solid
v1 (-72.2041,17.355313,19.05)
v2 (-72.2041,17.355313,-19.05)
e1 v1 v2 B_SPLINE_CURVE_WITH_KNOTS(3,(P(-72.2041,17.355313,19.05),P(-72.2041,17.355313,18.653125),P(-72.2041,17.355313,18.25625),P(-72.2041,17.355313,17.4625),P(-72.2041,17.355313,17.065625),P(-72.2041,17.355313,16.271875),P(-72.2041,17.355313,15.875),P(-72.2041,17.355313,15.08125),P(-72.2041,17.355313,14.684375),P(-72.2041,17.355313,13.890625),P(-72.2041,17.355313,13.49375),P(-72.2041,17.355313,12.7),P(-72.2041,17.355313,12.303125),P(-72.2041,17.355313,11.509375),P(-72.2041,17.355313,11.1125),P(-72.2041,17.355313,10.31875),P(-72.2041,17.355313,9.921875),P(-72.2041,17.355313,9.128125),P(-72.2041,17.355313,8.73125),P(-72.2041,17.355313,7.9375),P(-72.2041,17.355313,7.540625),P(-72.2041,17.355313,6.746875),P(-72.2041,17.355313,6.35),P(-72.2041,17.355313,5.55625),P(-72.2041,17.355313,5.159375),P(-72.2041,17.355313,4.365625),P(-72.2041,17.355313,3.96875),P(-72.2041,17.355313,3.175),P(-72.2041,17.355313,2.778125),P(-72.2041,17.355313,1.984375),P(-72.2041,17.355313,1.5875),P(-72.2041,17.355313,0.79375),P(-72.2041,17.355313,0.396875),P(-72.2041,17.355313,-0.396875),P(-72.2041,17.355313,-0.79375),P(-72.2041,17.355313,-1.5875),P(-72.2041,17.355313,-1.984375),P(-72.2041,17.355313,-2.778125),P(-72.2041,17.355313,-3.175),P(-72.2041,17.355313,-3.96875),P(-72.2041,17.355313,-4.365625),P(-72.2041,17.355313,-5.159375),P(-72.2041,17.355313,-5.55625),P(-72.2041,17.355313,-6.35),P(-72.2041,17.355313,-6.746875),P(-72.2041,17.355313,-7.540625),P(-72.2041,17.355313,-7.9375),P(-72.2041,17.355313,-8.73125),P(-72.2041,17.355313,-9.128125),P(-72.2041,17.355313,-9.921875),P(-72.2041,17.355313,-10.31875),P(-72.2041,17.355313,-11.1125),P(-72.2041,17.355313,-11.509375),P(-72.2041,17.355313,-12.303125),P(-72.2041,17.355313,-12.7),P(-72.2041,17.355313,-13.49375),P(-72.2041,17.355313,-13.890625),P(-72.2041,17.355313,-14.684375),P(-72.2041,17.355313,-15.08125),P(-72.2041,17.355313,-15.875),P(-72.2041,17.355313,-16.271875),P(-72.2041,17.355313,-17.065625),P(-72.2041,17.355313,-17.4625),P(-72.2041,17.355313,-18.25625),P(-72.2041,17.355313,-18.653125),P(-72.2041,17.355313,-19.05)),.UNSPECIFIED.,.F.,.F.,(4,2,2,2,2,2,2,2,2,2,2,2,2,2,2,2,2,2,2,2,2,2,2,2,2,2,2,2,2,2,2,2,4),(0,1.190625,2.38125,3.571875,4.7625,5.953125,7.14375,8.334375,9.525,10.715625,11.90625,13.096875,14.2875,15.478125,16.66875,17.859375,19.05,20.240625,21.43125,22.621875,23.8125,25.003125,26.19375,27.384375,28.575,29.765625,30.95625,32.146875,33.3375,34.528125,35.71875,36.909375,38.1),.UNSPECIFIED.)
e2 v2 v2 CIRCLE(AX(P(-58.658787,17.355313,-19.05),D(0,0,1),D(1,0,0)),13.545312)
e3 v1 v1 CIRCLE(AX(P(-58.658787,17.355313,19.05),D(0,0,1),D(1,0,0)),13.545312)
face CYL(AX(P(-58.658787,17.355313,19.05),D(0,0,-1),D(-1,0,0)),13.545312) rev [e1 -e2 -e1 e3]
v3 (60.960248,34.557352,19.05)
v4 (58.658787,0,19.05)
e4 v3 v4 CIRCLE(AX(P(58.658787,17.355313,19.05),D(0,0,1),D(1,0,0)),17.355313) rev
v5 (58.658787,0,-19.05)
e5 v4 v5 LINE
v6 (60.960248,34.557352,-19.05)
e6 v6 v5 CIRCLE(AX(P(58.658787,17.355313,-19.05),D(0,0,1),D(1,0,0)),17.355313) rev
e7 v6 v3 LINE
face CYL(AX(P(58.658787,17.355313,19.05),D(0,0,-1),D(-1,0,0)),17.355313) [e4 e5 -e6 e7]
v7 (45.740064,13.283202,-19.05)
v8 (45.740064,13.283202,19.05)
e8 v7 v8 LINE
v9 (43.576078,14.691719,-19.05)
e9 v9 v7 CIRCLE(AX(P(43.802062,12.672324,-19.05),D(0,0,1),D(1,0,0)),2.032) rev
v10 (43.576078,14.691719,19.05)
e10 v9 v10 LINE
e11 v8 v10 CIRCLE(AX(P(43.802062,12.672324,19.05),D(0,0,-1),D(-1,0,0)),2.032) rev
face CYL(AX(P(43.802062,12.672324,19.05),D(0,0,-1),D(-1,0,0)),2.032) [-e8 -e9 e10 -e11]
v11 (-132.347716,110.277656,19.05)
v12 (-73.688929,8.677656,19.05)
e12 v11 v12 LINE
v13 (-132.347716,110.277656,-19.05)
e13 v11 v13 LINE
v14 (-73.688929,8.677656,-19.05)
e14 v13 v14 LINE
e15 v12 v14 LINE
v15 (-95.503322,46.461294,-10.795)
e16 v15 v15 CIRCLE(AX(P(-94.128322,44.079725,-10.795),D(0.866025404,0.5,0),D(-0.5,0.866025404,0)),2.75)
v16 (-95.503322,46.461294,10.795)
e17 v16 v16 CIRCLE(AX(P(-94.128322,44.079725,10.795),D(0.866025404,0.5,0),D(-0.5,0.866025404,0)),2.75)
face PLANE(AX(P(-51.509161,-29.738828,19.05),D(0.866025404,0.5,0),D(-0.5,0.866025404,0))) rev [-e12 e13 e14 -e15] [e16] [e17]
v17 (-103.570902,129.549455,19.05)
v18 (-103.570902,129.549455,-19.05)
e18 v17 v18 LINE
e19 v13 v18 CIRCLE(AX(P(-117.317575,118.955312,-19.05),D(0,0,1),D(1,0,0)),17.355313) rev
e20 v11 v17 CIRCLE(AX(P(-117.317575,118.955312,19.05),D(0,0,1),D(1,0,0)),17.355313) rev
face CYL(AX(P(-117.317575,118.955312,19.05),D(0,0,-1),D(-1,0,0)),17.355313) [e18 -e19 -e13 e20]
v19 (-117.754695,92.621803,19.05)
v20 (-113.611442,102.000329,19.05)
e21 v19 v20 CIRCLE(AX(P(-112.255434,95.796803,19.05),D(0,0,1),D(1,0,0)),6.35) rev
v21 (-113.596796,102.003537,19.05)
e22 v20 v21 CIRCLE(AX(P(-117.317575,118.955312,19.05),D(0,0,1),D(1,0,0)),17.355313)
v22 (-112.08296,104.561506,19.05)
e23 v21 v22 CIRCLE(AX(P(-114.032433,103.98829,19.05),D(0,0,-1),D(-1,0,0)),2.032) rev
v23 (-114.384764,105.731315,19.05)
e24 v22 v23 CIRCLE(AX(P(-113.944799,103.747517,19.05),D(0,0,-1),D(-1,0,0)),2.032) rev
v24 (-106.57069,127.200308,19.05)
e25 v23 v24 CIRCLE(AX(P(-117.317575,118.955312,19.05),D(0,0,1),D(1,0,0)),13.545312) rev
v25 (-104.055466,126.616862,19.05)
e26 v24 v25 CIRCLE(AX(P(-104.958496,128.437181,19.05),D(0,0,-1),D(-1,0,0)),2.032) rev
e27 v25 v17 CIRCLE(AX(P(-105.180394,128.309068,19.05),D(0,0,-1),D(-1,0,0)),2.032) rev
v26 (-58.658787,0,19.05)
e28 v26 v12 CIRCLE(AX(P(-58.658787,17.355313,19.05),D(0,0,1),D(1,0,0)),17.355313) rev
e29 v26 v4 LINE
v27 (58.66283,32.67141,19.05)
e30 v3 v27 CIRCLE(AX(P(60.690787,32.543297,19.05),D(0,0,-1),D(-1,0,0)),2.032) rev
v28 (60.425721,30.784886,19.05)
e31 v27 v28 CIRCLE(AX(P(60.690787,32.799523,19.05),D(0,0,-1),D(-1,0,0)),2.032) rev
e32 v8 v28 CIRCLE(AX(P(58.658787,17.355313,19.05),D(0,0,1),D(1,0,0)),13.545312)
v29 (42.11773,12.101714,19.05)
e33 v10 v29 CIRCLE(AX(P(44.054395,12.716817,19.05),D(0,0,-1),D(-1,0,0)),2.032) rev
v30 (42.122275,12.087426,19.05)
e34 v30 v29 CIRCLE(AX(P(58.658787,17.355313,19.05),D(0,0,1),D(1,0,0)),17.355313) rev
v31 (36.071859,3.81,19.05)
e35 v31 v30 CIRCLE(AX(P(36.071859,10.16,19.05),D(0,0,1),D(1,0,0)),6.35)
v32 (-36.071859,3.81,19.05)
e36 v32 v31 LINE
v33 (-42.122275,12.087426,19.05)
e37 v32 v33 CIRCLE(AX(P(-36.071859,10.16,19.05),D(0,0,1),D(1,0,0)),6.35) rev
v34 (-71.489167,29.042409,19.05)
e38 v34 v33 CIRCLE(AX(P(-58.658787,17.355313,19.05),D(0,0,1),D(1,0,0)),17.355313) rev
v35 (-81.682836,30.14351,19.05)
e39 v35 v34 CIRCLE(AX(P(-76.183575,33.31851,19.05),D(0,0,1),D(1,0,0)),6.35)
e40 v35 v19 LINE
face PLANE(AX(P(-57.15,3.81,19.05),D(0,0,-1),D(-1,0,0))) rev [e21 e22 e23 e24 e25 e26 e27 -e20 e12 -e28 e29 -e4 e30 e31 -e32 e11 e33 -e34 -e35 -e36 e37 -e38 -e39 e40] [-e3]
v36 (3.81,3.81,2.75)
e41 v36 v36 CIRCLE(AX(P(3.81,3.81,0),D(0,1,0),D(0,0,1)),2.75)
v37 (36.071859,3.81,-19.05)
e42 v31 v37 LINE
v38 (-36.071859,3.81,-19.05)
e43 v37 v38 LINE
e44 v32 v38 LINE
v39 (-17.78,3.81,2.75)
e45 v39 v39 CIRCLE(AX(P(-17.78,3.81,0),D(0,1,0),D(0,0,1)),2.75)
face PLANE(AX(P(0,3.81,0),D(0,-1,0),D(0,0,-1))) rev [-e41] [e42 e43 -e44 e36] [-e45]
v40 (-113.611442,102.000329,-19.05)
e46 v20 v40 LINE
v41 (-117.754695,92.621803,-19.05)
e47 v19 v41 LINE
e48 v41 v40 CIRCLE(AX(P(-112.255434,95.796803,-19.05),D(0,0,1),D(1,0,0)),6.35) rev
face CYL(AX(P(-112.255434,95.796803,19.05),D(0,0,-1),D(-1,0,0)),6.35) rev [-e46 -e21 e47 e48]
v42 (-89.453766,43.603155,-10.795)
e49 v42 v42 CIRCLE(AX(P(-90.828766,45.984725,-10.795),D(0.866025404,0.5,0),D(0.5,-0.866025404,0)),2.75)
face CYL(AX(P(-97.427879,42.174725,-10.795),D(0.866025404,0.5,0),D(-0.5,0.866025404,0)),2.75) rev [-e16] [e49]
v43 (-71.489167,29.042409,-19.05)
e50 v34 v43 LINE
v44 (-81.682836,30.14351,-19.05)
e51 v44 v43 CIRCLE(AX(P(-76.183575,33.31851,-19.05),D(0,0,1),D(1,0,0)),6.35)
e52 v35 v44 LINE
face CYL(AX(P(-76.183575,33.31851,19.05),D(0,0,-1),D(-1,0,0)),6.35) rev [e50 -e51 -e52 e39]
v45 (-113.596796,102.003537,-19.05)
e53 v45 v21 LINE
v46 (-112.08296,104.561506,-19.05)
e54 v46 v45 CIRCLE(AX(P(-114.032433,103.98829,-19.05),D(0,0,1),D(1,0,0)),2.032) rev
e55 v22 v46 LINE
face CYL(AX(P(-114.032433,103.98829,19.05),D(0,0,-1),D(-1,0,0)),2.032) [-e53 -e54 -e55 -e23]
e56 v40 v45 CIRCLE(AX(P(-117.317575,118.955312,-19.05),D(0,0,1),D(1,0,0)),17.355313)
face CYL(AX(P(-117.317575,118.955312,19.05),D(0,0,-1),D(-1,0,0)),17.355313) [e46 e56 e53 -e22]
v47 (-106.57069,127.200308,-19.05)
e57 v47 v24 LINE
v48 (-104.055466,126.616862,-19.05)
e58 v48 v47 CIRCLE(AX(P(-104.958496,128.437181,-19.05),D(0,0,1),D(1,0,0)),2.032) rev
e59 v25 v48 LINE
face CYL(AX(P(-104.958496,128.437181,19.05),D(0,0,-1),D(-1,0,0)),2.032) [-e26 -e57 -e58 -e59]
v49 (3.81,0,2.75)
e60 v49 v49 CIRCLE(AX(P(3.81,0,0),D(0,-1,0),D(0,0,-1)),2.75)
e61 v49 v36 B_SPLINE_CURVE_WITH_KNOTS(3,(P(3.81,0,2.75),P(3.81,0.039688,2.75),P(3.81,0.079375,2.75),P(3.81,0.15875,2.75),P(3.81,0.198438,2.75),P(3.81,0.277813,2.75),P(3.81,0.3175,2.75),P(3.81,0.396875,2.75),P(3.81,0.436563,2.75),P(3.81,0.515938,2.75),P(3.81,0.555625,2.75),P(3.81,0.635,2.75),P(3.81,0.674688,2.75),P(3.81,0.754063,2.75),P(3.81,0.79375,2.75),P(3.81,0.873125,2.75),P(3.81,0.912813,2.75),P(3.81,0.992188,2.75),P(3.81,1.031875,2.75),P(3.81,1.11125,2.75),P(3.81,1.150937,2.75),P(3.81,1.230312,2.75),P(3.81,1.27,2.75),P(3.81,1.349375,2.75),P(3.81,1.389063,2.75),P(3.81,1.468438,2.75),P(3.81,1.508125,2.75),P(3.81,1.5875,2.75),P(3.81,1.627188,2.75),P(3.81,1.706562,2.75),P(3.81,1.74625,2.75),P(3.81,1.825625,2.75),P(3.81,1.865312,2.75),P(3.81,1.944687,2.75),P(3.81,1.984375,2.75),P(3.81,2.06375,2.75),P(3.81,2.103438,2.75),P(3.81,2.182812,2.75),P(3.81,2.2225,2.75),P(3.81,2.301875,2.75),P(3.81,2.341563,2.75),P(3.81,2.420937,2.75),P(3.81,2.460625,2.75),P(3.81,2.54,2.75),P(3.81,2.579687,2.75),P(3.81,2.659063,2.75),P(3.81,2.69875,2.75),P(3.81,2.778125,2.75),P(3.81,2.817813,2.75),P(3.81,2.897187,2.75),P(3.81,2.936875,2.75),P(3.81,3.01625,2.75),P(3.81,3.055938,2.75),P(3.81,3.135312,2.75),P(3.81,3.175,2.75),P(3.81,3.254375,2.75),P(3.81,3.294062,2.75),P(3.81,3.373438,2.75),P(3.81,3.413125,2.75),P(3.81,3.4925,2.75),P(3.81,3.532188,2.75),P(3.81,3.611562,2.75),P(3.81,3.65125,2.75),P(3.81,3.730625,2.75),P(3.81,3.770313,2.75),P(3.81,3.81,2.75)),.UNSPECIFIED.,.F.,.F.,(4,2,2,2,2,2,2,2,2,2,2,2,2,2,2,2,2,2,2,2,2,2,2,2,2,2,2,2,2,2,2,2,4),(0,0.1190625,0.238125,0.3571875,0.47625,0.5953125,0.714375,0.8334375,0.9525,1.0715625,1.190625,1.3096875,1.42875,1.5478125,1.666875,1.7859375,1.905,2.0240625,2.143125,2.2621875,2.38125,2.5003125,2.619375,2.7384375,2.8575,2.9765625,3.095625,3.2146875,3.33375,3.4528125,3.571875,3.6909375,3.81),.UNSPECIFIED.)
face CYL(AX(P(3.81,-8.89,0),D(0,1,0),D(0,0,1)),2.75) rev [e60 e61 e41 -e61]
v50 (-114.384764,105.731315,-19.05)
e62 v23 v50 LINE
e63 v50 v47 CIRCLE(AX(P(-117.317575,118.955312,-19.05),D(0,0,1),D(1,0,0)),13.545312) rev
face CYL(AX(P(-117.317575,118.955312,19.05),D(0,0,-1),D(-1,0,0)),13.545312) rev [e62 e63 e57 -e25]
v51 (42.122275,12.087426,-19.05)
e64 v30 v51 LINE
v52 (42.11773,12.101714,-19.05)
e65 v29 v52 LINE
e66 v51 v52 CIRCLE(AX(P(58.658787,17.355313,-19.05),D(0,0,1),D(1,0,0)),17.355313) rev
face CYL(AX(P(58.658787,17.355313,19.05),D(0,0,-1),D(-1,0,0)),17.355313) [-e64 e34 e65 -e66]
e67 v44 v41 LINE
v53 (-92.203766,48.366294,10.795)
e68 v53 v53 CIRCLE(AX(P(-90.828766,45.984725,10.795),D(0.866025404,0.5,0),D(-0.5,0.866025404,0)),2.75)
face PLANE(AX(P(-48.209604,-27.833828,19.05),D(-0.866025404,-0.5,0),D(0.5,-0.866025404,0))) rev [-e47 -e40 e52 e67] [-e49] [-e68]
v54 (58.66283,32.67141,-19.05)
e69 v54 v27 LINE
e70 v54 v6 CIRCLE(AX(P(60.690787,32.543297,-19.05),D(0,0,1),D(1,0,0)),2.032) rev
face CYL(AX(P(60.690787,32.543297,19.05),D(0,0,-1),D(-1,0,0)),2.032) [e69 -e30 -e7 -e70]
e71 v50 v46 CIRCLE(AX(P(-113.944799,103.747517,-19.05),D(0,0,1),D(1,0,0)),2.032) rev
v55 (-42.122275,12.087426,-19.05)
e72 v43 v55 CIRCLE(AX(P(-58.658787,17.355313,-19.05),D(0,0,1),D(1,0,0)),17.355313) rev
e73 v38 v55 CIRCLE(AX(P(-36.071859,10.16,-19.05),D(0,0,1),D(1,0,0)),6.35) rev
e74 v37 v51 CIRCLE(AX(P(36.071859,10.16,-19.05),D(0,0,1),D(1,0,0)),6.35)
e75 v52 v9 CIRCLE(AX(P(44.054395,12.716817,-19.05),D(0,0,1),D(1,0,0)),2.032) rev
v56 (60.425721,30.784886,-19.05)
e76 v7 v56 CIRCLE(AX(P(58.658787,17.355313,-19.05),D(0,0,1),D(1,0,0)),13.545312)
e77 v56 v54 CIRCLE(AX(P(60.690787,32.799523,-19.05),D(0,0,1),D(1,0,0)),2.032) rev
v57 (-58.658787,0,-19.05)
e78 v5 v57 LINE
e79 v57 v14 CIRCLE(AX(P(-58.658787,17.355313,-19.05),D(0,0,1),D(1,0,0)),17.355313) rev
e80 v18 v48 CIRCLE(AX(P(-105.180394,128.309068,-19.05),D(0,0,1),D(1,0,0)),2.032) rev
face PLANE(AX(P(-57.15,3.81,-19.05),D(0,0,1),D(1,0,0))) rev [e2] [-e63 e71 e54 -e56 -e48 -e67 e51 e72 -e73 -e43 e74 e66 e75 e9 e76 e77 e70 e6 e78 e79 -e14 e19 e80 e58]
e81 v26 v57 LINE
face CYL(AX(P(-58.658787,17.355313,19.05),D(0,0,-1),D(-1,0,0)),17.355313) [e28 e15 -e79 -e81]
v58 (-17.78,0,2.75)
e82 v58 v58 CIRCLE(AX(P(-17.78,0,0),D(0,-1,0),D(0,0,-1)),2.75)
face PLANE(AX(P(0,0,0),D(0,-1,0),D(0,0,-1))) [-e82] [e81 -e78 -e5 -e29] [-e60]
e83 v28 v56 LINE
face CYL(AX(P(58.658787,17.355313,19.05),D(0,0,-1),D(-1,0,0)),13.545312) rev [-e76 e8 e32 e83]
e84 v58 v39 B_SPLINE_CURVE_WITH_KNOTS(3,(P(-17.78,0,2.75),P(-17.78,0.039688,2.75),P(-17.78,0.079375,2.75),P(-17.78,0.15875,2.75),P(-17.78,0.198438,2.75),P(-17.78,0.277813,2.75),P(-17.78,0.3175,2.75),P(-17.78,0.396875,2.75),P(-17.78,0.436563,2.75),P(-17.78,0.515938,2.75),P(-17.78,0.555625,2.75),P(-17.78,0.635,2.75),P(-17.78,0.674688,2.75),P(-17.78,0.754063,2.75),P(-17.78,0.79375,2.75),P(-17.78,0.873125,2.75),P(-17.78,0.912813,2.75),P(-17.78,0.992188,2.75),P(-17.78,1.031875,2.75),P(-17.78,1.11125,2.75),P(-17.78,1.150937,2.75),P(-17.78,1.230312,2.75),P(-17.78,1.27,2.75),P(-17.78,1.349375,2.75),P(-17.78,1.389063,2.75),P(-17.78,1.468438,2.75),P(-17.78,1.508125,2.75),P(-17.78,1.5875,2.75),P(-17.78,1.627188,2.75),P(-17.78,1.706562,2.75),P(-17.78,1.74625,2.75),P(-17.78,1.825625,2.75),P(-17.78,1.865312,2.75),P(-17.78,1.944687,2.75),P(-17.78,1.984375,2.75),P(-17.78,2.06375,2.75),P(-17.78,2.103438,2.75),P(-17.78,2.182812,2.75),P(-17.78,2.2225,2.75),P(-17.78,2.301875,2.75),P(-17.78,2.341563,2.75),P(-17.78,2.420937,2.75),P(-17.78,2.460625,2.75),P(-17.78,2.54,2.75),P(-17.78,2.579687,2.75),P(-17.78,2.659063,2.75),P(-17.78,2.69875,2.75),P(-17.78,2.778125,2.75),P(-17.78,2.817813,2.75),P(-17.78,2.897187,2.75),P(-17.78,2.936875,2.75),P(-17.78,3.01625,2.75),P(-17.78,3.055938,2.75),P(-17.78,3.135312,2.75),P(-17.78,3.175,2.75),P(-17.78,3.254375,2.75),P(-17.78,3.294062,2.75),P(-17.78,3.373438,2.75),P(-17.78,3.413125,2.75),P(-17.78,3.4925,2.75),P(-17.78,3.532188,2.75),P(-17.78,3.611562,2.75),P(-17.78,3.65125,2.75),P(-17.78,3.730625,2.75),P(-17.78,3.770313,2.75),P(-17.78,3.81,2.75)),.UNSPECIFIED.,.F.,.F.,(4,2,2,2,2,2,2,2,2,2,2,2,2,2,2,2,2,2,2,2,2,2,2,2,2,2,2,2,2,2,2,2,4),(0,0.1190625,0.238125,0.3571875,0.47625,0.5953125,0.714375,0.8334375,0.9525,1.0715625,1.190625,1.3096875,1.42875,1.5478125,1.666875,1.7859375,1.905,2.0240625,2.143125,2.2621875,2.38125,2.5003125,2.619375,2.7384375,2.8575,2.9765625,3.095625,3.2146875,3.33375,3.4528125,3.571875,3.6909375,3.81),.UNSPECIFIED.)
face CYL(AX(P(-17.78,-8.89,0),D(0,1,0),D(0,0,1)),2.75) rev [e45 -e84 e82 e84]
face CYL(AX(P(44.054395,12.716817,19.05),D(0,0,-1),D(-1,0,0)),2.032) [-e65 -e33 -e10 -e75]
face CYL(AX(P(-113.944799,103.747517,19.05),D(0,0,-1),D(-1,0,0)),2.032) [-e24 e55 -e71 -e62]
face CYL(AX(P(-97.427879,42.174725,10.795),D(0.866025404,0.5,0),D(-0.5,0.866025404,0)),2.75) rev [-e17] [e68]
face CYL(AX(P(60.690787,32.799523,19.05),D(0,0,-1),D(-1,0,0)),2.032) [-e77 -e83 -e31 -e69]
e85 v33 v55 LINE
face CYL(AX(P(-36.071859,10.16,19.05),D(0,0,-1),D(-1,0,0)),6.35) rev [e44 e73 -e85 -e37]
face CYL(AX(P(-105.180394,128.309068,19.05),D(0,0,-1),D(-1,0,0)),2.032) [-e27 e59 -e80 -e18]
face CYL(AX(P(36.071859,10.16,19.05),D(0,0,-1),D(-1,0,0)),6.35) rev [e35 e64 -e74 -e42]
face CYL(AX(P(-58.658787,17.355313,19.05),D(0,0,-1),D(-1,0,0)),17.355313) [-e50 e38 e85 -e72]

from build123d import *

# Parameters (mm, degrees)
SKETCH3_W               = 114.3
SKETCH3_H               = 38.1
BOSS_EXTRUDE1_DEPTH     = 3.81
BOSS_EXTRUDE2_START     = -19.05
BOSS_EXTRUDE2_OUTLINE_R = 13.5453125
BOSS_EXTRUDE2_DEPTH     = 38.1
FILLET1_R               = 2.032
SKETCH5_R               = 2.749999961
CUT_EXTRUDE4_DEPTH      = 12.7
SKETCH6_R               = 2.749999961
CUT_EXTRUDE5_DEPTH      = 7.62


# Read off the part's stored shape, not the designer's step: Boss-Extrude2
with BuildPart() as part:
    # Sketch3 → Boss-Extrude1 (new body)
    with BuildSketch(Plane(origin=(0, 0, 0), x_dir=(1, 0, 0), z_dir=(0, 1, 0))):
        Rectangle(SKETCH3_W, SKETCH3_H)
    extrude(amount=BOSS_EXTRUDE1_DEPTH)

    # Boss-Extrude2 outline → Boss-Extrude2 (add)
    # profile 1 of 2: a face of its own
    with BuildSketch(Plane.XY.offset(BOSS_EXTRUDE2_START)):
        with BuildLine():
            ThreePointArc((58.658787305, 0), (76.014099805, 17.3553125), (58.658787305, 34.710625))
            Line((58.658787305, 34.710625), (58.658787305, 30.900625))
            ThreePointArc((58.658787305, 30.900625), (69.035098676, 8.648553456), (45.319258538, 15.003193668))
            Line((45.319258538, 15.003193668), (41.567140999, 14.341594112))
            ThreePointArc((41.567140999, 14.341594112), (41.806974837, 13.2052175), (42.122274879, 12.087425946))
            ThreePointArc((42.122274879, 12.087425946), (41.198342199, 6.412778013), (36.071859255, 3.81))
            Line((36.071859255, 3.81), (57.15, 3.81))
            Line((57.15, 3.81), (57.15, 0))
            Line((57.15, 0), (58.658787305, 0))
        make_face()
    # profile 2 of 2: a face of its own
    with BuildSketch(Plane.XY.offset(BOSS_EXTRUDE2_START)):
        with BuildLine():
            Line((-58.658787305, 0), (-57.15, 0))
            Line((-57.15, 0), (-57.15, 3.81))
            Line((-57.15, 3.81), (-36.071859255, 3.81))
            ThreePointArc((-36.071859255, 3.81), (-41.198342199, 6.412778013), (-42.122274879, 12.087425946))
            ThreePointArc((-42.122274879, 12.087425946), (-49.981131055, 32.385454016), (-71.489167098, 29.042409074))
            ThreePointArc((-71.489167098, 29.042409074), (-76.865522705, 27.00523428), (-81.682836057, 30.143509735))
            Line((-81.682836057, 30.143509735), (-117.754695312, 92.621802688))
            ThreePointArc((-117.754695312, 92.621802688), (-118.063864905, 98.362856156), (-113.611441977, 102.000329294))
            ThreePointArc((-113.611441977, 102.000329294), (-112.485756074, 102.286167225), (-111.381708141, 102.646653335))
            Line((-111.381708141, 102.646653335), (-112.684804887, 106.22688222))
            ThreePointArc((-112.684804887, 106.22688222), (-130.046004812, 123.588082145), (-105.586989883, 125.727968673))
            Line((-105.586989883, 125.727968673), (-102.287433094, 127.632968673))
            ThreePointArc((-102.287433094, 127.632968673), (-125.99523086, 133.985453938), (-132.347716126, 110.277656173))
            Line((-132.347716126, 110.277656173), (-73.688928821, 8.67765625))
            ThreePointArc((-73.688928821, 8.67765625), (-67.336443555, 2.325170984), (-58.658787305, 0))
        make_face()
        with Locations((-58.658787305, 17.3553125)):
            Circle(BOSS_EXTRUDE2_OUTLINE_R, mode=Mode.SUBTRACT)
    extrude(amount=BOSS_EXTRUDE2_DEPTH)

    # Fillet1
    # the kernel refuses this fillet: 2.032 mm, written as the material it takes off along each edge
    with BuildSketch(Plane(origin=(58.658787305, 34.710625, -24.816396244), x_dir=(0.9977896842762429, -0.06645107938864002, 0), z_dir=(0, 0, 1))) as fillet1_piece_1:
        with BuildLine():
            CenterArc((2.171529904, -2.027508638), FILLET1_R, 86.189825964, 97.620348072)
            Line((0.144021266, -2.162537232), (0, 0))
            ThreePointArc((0, 0), (1.153279249, 0.03836072), (2.306558498, 0))
        make_face()
    extrude(amount=49.632792488, mode=Mode.SUBTRACT)
    with BuildSketch(Plane(origin=(58.658787305, 30.900625, -23.797245223), x_dir=(0, 1, 0), z_dir=(0, 0, 1)), Plane(origin=(-112.684804887, 106.22688222, -23.797245223), x_dir=(0.342020143325642, -0.9396926207859182, 0), z_dir=(0, 0, 1))) as fillet1_piece_2:
        with BuildLine():
            CenterArc((1.898898089, -2.032), FILLET1_R, 90, 82.504627273)
            ThreePointArc((-0.115739283, -1.766933481), (-0.028965791, -0.885360027), (0, 0))
            Line((0, 0), (1.898898089, 0))
        make_face()
    extrude(amount=47.594490446, mode=Mode.SUBTRACT)
    with BuildSketch(Plane(origin=(45.319258538, 15.003193668, -23.797245222), x_dir=(0.23764666879808158, -0.9713516669101747, 0), z_dir=(0, 0, 1))) as fillet1_piece_3:
        with BuildLine():
            CenterArc((1.903537334, -2.027654697), FILLET1_R, 93.747686362, 82.50462726)
            Line((-0.124117363, -1.894837416), (0, 0))
            ThreePointArc((0, 0), (0.885360027, -0.028965791), (1.770720053, 0))
        make_face()
    extrude(amount=47.594490443, mode=Mode.SUBTRACT)
    with BuildSketch(Plane(origin=(41.567140999, 14.341594112, -24.816396246), x_dir=(0.984807753053284, 0.17364817743397684, 0), z_dir=(0, 0, 1))) as fillet1_piece_4:
        with BuildLine():
            CenterArc((2.167327711, -2.032), FILLET1_R, 90, 97.620348093)
            ThreePointArc((0.153273303, -2.301460276), (0.038360721, -1.153279249), (0, 0))
            Line((0, 0), (2.167327711, 0))
        make_face()
    extrude(amount=49.632792491, mode=Mode.SUBTRACT)
    with BuildSketch(Plane(origin=(-102.287433094, 127.632968673, -24.816396244), x_dir=(-0.8660254038225857, -0.4999999999339274, 0), z_dir=(0, 0, 1))) as fillet1_piece_5:
        with BuildLine():
            CenterArc((2.167327711, -2.032), FILLET1_R, 90, 97.62034808)
            ThreePointArc((0.153273302, -2.301460275), (0.03836072, -1.153279249), (0, 0))
            Line((0, 0), (2.167327711, 0))
        make_face()
    extrude(amount=49.632792489, mode=Mode.SUBTRACT)
    with BuildSketch(Plane(origin=(-105.586989883, 125.727968673, -23.797245222), x_dir=(-0.5555366573888737, 0.8314920458412077, 0), z_dir=(0, 0, 1))) as fillet1_piece_6:
        with BuildLine():
            CenterArc((1.903537334, -2.027654697), FILLET1_R, 93.747686363, 82.504627266)
            Line((-0.124117363, -1.894837416), (0, 0))
            ThreePointArc((0, 0), (0.885360027, -0.028965791), (1.770720053, 0))
        make_face()
    extrude(amount=47.594490445, mode=Mode.SUBTRACT)
    with BuildSketch(Plane(origin=(-111.381708141, 102.646653335, -24.816396244), x_dir=(-0.960343211064482, -0.2788205820278691, 0), z_dir=(0, 0, 1))) as fillet1_piece_7:
        with BuildLine():
            CenterArc((2.171529904, -2.027508638), FILLET1_R, 86.189825951, 97.620348077)
            Line((0.144021265, -2.162537231), (0, 0))
            ThreePointArc((0, 0), (1.153279249, 0.03836072), (2.306558498, 0))
        make_face()
    extrude(amount=49.632792488, mode=Mode.SUBTRACT)

    # Sketch5 → Cut-Extrude4 (cut)
    with BuildSketch(Plane(origin=(0, 3.81, 0), x_dir=(1, 0, 0), z_dir=(0, 1, 0))):
        with Locations(Location((-17.78, 0, 0), (0, 0, 270))):
            Circle(SKETCH5_R)
        with Locations(Location((3.81, 0, 0), (0, 0, 270))):
            Circle(SKETCH5_R)
    extrude(amount=-CUT_EXTRUDE4_DEPTH, mode=Mode.SUBTRACT)

    # Sketch6 → Cut-Extrude5 (cut)
    with BuildSketch(Plane(origin=(-48.209604448, -27.833828106, 0), x_dir=(0, 0, -1), z_dir=(0.8660254037844433, 0.4999999999999923, 0))):
        with Locations(Location((-10.795, 85.238322473, 0), (0, 0, 90))):
            Circle(SKETCH6_R)
        with Locations(Location((10.795, 85.238322473, 0), (0, 0, 90))):
            Circle(SKETCH6_R)
    extrude(amount=-CUT_EXTRUDE5_DEPTH, mode=Mode.SUBTRACT)


solid = part.part
